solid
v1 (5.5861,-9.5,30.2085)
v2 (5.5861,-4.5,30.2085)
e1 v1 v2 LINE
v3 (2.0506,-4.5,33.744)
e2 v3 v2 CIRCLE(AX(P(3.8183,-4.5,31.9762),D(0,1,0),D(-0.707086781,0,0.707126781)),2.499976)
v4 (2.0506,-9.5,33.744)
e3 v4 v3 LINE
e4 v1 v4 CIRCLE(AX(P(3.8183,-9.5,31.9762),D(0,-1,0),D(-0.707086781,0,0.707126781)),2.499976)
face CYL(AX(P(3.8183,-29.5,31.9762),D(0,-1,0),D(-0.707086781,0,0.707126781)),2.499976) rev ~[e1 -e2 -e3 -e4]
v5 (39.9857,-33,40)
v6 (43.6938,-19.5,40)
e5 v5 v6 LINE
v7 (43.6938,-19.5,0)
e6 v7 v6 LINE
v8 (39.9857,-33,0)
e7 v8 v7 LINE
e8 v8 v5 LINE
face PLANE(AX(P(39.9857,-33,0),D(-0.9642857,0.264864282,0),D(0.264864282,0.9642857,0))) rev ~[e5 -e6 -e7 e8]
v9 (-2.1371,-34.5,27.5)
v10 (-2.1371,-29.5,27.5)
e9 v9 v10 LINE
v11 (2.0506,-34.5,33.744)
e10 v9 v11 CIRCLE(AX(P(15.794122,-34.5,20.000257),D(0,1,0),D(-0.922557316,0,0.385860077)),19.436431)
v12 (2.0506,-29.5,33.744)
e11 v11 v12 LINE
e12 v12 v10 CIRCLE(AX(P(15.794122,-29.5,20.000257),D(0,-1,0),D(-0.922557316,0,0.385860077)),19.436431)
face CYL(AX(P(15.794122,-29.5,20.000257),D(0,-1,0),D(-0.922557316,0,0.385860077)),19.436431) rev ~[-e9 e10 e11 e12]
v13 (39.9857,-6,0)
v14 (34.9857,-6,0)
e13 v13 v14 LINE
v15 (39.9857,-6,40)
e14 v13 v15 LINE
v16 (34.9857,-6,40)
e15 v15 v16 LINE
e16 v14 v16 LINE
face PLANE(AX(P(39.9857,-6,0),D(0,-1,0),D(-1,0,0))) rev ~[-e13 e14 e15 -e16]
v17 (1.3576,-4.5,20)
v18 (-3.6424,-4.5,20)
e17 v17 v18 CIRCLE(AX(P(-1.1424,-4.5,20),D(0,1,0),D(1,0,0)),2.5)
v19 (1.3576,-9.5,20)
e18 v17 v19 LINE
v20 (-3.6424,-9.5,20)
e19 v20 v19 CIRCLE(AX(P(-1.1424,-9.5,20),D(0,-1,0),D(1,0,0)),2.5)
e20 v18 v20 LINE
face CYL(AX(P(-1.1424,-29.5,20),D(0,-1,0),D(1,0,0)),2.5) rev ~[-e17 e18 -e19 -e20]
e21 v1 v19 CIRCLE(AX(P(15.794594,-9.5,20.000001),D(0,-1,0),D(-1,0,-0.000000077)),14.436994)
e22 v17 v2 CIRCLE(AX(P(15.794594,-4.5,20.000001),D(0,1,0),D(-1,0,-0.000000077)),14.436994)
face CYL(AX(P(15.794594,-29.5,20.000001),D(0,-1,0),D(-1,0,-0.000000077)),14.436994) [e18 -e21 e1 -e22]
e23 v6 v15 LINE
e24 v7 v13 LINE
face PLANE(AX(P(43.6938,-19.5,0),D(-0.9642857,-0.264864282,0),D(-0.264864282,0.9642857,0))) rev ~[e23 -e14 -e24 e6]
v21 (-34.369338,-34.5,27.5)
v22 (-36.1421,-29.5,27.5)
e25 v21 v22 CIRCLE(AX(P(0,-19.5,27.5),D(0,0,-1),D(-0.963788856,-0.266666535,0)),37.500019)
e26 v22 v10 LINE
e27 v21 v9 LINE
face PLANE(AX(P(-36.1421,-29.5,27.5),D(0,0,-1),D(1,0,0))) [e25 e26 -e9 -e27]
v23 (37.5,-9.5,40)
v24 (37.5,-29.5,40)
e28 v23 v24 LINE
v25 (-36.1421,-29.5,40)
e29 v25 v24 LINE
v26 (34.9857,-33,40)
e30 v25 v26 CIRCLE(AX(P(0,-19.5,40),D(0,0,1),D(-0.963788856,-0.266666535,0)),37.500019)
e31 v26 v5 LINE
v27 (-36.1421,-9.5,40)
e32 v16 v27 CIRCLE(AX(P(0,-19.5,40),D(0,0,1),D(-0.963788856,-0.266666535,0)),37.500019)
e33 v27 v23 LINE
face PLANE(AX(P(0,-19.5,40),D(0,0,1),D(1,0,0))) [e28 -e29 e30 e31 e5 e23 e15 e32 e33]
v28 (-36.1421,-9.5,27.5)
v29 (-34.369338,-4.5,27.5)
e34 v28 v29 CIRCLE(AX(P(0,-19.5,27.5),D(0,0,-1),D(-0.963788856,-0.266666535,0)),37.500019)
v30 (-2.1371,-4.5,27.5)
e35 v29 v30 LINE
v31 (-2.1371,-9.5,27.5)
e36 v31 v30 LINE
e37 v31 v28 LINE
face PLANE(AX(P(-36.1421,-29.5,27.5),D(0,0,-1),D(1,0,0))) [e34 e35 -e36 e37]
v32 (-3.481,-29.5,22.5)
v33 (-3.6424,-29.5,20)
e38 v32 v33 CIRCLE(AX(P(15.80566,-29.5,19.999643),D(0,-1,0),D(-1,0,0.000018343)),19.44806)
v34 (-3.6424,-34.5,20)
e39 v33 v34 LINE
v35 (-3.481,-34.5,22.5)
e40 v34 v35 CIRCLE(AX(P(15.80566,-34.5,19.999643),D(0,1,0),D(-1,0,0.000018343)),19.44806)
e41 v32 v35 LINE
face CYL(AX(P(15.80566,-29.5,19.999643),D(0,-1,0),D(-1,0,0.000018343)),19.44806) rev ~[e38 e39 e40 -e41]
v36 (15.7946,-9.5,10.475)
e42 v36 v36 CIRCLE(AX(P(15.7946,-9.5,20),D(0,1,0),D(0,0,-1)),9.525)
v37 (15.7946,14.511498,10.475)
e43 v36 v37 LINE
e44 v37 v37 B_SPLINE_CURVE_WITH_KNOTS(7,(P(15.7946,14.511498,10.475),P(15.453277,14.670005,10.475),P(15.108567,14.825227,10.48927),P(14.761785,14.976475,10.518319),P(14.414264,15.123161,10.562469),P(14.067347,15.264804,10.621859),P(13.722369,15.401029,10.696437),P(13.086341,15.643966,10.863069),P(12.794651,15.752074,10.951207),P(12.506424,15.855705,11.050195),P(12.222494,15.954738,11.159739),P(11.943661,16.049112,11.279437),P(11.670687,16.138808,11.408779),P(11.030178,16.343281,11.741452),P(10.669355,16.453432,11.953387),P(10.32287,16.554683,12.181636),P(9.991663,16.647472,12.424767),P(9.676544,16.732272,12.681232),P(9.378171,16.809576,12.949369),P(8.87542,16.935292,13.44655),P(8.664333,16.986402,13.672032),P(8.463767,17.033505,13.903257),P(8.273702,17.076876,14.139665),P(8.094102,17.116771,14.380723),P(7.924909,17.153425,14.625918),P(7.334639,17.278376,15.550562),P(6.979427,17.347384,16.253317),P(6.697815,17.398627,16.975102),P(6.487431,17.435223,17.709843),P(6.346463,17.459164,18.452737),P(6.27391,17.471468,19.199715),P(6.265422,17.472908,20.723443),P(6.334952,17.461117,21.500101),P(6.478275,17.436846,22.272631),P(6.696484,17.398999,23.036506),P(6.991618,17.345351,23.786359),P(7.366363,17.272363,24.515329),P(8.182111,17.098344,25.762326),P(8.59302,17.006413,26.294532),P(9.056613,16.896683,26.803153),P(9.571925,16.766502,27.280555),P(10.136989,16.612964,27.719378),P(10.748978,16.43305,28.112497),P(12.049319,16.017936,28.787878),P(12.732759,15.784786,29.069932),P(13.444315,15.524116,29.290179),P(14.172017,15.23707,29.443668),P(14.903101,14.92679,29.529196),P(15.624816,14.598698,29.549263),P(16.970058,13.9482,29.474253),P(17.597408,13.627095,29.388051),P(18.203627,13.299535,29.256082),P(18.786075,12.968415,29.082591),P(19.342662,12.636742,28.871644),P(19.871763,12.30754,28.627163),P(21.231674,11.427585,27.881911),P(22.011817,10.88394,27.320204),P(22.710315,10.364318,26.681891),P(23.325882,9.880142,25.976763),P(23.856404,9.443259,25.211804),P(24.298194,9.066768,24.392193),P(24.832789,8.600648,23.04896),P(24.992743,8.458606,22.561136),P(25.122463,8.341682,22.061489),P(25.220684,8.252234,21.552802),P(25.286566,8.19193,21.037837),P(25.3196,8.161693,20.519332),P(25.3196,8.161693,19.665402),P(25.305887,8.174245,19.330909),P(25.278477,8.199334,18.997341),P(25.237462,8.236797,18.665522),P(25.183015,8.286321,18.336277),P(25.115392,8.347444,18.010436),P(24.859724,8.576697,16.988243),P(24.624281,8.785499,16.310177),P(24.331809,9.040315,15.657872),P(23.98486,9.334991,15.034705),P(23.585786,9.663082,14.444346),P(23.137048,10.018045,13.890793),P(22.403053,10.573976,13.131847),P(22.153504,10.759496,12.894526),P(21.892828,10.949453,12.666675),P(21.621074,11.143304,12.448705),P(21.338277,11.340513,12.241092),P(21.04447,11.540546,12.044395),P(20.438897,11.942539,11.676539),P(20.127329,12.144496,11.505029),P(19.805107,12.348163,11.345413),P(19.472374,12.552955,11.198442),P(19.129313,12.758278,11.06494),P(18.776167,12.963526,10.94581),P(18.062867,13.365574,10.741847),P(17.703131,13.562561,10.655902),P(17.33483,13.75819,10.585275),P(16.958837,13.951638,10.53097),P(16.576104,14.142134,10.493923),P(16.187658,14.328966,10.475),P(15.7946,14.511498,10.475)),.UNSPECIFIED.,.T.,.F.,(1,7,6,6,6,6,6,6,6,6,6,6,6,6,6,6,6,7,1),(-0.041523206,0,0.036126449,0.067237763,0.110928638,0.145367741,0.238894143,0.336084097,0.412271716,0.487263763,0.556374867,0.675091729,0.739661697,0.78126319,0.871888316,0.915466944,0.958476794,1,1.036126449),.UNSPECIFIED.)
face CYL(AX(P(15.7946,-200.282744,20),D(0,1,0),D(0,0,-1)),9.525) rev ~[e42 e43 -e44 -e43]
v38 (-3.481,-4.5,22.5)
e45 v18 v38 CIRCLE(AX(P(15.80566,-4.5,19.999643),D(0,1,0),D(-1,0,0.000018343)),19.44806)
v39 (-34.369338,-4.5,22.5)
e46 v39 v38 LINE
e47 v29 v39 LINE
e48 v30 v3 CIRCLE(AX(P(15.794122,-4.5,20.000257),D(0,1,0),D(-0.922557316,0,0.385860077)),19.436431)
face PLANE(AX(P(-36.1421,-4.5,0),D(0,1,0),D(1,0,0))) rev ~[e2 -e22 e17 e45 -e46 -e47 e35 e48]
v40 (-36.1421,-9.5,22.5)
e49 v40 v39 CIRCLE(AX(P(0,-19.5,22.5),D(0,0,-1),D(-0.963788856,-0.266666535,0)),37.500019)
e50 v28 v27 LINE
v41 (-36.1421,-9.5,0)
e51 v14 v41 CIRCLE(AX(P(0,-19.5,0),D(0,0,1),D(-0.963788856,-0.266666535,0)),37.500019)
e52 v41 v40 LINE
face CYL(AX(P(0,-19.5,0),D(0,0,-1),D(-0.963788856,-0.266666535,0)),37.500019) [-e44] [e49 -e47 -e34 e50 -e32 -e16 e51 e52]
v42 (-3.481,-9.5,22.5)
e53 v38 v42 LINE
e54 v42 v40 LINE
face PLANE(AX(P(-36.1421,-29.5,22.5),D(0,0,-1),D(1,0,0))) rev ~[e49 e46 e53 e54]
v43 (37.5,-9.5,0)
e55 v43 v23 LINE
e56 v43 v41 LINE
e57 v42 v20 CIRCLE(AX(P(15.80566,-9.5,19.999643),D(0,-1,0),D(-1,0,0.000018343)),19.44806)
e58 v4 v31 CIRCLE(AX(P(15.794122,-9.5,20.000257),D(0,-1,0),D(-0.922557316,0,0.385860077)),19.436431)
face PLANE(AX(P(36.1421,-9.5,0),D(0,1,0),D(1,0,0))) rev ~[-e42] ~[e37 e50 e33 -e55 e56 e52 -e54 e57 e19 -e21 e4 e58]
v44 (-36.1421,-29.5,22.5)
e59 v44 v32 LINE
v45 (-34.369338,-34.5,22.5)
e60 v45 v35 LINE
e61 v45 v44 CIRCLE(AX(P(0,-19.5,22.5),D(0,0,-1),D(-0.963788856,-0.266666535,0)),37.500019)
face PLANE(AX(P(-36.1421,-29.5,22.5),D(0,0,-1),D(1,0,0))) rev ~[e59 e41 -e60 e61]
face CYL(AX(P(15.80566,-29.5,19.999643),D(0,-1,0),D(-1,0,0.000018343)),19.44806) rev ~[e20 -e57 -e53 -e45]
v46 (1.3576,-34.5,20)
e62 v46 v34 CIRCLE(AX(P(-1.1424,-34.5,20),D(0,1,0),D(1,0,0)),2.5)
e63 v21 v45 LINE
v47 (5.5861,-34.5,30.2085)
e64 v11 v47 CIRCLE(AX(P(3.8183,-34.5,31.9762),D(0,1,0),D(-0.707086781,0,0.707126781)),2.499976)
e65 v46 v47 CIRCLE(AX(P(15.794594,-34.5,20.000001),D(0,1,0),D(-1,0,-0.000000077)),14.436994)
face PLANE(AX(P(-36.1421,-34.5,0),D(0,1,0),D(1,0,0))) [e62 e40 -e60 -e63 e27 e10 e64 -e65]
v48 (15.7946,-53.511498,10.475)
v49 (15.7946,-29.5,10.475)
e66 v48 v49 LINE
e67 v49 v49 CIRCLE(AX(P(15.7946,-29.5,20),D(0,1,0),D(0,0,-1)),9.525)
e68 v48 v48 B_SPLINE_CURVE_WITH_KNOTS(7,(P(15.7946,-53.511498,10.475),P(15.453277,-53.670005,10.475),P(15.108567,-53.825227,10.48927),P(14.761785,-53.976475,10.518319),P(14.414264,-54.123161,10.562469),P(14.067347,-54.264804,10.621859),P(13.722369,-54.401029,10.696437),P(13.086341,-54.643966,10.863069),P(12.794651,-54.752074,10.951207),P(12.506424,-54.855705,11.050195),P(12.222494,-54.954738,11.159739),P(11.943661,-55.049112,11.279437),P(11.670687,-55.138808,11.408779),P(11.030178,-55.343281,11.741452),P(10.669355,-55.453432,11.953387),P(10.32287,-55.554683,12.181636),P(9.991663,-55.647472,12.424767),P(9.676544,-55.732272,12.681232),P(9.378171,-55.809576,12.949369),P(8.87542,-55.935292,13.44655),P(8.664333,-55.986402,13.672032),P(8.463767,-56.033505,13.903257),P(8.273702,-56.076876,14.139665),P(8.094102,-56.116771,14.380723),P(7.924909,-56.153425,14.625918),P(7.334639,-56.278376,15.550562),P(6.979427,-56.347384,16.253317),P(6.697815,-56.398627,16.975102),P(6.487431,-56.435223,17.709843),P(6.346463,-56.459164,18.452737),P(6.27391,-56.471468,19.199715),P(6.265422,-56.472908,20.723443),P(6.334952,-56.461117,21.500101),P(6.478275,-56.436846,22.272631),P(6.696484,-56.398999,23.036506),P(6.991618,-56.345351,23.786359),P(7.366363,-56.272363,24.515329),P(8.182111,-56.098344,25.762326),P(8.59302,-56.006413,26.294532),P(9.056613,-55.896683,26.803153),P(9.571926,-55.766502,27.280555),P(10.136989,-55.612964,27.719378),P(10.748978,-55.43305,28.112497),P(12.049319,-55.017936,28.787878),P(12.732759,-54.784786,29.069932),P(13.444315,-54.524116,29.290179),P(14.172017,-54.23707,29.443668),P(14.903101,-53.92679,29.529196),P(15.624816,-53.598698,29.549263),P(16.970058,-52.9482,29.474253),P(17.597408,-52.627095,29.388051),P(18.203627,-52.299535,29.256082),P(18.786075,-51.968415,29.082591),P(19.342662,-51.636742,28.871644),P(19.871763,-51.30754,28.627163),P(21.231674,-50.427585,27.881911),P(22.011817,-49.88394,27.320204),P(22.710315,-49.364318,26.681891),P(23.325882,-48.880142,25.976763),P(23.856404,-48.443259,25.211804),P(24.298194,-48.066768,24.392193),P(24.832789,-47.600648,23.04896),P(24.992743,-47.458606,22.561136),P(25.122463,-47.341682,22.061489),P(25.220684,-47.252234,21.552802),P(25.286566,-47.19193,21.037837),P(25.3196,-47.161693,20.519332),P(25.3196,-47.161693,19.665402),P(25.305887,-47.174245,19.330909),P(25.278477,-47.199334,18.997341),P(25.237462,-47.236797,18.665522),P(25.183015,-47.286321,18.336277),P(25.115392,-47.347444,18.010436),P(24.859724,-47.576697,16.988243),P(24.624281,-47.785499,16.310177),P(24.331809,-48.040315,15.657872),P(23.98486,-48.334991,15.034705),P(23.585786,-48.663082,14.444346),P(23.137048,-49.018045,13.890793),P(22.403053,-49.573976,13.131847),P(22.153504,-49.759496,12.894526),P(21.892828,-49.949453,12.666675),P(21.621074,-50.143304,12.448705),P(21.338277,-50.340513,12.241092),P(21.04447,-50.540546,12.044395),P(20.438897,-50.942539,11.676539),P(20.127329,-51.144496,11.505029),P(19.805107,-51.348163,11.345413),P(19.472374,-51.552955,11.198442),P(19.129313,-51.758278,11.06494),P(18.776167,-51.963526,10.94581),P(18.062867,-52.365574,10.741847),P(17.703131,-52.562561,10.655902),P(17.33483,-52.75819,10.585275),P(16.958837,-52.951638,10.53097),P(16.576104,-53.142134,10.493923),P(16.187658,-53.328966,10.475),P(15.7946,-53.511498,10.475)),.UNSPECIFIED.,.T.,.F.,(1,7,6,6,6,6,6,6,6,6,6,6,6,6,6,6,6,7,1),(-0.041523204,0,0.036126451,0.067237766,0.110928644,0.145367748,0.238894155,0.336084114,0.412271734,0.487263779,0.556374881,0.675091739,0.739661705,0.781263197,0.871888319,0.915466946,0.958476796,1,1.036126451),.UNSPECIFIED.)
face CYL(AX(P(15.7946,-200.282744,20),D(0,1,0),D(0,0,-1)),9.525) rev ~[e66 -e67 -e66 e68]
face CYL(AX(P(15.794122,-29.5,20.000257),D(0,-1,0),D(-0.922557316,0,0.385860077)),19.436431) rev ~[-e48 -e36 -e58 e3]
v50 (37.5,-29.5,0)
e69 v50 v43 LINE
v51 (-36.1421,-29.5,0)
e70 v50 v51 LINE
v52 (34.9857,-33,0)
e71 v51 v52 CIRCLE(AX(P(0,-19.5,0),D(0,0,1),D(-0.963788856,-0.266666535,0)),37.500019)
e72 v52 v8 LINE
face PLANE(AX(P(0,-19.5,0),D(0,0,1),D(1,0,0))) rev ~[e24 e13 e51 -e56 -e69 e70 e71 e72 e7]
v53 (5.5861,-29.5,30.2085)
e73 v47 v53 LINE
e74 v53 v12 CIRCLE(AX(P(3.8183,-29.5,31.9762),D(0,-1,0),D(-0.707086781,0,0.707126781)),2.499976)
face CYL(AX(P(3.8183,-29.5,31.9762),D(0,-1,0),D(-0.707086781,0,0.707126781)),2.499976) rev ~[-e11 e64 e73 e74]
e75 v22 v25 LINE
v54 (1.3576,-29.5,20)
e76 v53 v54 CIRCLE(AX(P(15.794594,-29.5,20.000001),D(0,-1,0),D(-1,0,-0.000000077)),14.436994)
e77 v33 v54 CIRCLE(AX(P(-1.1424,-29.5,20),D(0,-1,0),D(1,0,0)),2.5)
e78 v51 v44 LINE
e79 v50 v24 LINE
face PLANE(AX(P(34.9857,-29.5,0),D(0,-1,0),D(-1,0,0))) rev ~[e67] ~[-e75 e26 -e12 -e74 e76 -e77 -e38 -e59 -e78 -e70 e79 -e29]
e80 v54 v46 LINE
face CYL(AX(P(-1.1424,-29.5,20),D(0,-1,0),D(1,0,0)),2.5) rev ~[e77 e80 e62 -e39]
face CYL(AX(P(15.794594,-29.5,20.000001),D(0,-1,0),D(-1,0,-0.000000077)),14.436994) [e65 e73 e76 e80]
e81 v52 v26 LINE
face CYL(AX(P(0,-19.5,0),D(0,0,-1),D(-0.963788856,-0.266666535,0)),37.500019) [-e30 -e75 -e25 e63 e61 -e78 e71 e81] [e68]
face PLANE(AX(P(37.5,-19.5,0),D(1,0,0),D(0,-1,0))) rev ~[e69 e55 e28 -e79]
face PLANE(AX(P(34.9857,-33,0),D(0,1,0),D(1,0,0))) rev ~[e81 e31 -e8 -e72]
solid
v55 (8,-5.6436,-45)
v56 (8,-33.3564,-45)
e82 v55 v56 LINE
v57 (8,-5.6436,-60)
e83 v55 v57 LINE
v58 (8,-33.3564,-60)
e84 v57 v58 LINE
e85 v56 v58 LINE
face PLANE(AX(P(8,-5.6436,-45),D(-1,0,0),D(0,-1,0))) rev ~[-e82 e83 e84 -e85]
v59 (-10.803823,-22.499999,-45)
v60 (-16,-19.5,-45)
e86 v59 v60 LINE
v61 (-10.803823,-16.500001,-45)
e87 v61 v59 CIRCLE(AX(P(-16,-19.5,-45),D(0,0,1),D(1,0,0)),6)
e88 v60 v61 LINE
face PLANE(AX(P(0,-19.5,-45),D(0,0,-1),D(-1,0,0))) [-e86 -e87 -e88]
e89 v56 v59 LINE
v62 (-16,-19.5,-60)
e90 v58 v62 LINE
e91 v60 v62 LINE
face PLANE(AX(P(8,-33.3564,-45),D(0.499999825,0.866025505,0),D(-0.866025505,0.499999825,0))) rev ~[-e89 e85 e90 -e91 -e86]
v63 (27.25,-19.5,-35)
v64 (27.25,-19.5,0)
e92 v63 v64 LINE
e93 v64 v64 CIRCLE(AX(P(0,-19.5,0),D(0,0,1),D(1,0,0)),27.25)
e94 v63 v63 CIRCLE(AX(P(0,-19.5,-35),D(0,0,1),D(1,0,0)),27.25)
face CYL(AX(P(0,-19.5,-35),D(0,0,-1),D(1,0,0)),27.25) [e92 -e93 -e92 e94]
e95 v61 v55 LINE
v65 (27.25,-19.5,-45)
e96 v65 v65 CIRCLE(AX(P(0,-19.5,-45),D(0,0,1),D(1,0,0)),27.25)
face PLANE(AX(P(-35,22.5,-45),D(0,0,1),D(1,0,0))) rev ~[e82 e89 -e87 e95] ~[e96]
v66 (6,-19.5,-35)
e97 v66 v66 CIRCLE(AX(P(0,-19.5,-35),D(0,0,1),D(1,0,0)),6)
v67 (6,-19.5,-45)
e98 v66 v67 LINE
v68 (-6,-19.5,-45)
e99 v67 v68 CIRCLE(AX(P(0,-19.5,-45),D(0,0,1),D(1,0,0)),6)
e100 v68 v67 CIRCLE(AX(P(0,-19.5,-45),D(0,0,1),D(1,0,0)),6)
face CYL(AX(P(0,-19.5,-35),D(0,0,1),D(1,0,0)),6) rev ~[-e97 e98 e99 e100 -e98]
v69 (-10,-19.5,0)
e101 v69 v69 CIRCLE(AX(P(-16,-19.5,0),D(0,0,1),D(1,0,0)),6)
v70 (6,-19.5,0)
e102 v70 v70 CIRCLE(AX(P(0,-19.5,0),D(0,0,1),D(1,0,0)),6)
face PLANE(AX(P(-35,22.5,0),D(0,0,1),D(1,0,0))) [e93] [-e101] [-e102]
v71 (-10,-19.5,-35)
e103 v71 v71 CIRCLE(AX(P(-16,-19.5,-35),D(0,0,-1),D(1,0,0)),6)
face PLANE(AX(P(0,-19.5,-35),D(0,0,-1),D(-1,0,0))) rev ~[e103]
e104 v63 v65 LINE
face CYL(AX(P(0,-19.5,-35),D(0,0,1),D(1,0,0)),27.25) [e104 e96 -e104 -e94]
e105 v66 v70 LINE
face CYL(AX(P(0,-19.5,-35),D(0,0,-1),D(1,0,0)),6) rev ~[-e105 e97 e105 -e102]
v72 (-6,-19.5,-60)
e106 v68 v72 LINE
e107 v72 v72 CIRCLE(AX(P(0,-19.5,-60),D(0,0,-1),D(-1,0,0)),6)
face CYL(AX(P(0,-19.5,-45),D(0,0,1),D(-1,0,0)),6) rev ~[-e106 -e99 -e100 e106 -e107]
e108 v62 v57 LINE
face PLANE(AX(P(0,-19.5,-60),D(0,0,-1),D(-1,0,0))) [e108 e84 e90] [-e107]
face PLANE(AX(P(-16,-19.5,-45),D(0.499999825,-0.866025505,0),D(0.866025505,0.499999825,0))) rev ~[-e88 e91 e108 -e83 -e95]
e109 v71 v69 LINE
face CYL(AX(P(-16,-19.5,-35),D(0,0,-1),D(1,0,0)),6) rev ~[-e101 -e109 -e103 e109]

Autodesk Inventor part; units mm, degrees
ref_plane "YZ Plane" through (0, 0, 0) normal (1, 0, 0) x (0, 1, 0)
ref_plane "XZ Plane" through (0, 0, 0) normal (0, 1, 0) x (-1, 0, 0)
ref_plane "XY Plane" through (0, 0, 0) normal (0, 0, 1) x (1, 0, 0)
ref_plane "Work Plane1" through (-35, 22.5, -35) normal (0, 0, 1) x (1, 0, 0)
sketch "Sketch1" plane through (-35, 22.5, -35) normal (0, 0, 1) x (1, 0, 0)
  circle A0 centre (35, -42) radius 27.25
  circle A1 centre (35, -42) radius 6
  circle A2 centre (19, -42) radius 6
  dimension "d0" = 54.5
  dimension "d24" = 12
  dimension "d70" = 12
  dimension "d71" = 16
ref_plane "Work Plane2" through (0, -19.5, 0) normal (0, 0, 1) x (1, 0, 0)
sketch "Sketch2" plane through (0, -19.5, 0) normal (0, 0, 1) x (1, 0, 0)
  arc A0 (-36.1421, -10) -> (-36.1421, 10) centre (0, 0) ccw
  line L0 (37.5, -10) -> (-36.1421, -10)
  line L1 (-36.1421, 10) -> (37.5, 10)
  line L2 (37.5, 10) -> (37.5, -10)
  line L3 (34.9857, -13.5) -> (39.9857, -13.5)
  line L4 (39.9857, -13.5) -> (39.9857, 13.5)
  line L5 (39.9857, 13.5) -> (34.9857, 13.5)
  line L6 (34.9857, 13.5) -> (34.9857, -13.5)
  line L7 (39.9857, -13.5) -> (43.6938, 0)
  line L8 (43.6938, 0) -> (39.9857, 13.5)
  point P0 (0, 19.5)
  point P1 (37.5, 0)
  point P2 (36.1421, 10)
  point P3 (36.1421, -10)
  dimension "d3" = 75
  dimension "d40" = 5
  dimension "d41" = 27
  dimension "d44" = 14
extrude "Extrusion2" add sketch "Sketch2" along normal blind 40 contours L0 L6 A0 | L6 L0 A0 | A0 L0 L2 L1 L5 L4 L3 | L4 L8 L7 | L6 A0 L1 | L1 A0 L6
ref_plane "Work Plane3" through (-36.1421, -9.5, 0) normal (0, -1, 0) x (1, 0, 0)
sketch "Sketch4" plane through (-36.1421, -9.5, 0) normal (0, -1, 0) x (1, 0, 0)
  line L0 (0, 0) -> (10.5247, 0) projected
  point P0 (36.1421, 0)
  point P1 (51.9367, 20)
hole "Hole2" at (15.7946, -9.5, 20) direction (0, 1, 0) diameter 19.05 end through all both
extrude "Extrusion3" add sketch "Sketch1" along normal blind 35 and the other way blind 10
sketch "Sketch8" plane through (0, -19.5, -45) normal (0, 0, -1) x (-1, 0, 0)
  circle A0 centre (0, 0) radius 6 projected
  circle A1 centre (0, 0) radius 6 projected
  line L0 (-6, 10.3923) -> (12, 0)
  line L1 (12, 0) -> (-6, -10.3923)
  line L2 (-6, -10.3923) -> (-6, 10.3923)
  line L3 (-8, -13.8564) -> (16, 0)
  line L4 (16, 0) -> (-8, 13.8564)
  line L5 (-8, 13.8564) -> (-8, -13.8564)
  point P0 (0, 19.5)
  point P1 (-6, 0)
  point P2 (-6, 0)
  point P3 (3, -5.1962)
  point P4 (3, 5.1962)
  dimension "d69" = 2
extrude "Extrusion5" add sketch "Sketch8" along normal blind 15 contours A0 L0 L1 | A0 L2 L0 | L1 L2 A0 | L5 L4 L3
ref_plane "Work Plane4" through (-35, 22.5, 0) normal (0, 0, 1) x (1, 0, 0)
split body "Split1" result two bodies by plane through (-35, 22.5, 0) normal (0, 0, 1) first body at (28.9114, 3.5897, 20.1633)
sketch "Sketch11" plane through (0, -19.5, -45) normal (0, 0, -1) x (-1, 0, 0)
  arc A0 (10.8038, -3) -> (10.8038, 3) centre (16, 0) ccw projected
  arc A1 (10.8038, 3) -> (10.8038, -3) centre (16, 0) ccw projected
extrude "Extrusion8" add sketch "Sketch11" against normal blind 10 bodies 3
sketch "Sketch13" plane through (-36.1421, -29.5, 0) normal (0, 1, 0) x (1, 0, 0)
  line L0 (40, -20) -> (40, -20)
  circle A0 centre (51.9367, -20) radius 9.525 projected
  line L1 (0, 0) -> (0, -40) projected
  line L2 (0, -22.5) -> (32.6611, -22.5)
  arc A1 (37.4997, -20) -> (41.7282, -30.2085) centre (51.9367, -20) ccw
  line L3 (51.9367, -20) -> (41.7282, -30.2085) construction
  line L4 (51.9367, -20) -> (37.4997, -20) construction
  arc A2 (38.1927, -33.744) -> (41.7282, -30.2085) centre (39.9604, -31.9763) ccw
  arc A3 (0, -22.5) -> (0, -27.5) centre (0, -25) ccw
  line L5 (0, -27.5) -> (34.005, -27.5)
  arc A4 (32.4997, -20) -> (32.6611, -22.5) centre (51.9367, -20) ccw
  arc A5 (34.005, -27.5) -> (38.1927, -33.744) centre (51.9367, -20) ccw
  arc A6 (37.4997, -20) -> (32.4997, -20) centre (34.9997, -20) ccw
  point P0 (36.1421, 0)
  dimension "d62" = 45
  dimension "d82" = 14.437
  dimension "d83" = 5
  dimension "d84" = 45
  dimension "d85" = 2.5
  dimension "d86" = 2.5
extrude "Extrusion9" cut sketch "Sketch13" along normal blind 25 and the other way blind 5 contours L2 A4 A6 A1 A2 A5 L5 L1 | L1 A3 bodies 2
properties part number "handle_base"
